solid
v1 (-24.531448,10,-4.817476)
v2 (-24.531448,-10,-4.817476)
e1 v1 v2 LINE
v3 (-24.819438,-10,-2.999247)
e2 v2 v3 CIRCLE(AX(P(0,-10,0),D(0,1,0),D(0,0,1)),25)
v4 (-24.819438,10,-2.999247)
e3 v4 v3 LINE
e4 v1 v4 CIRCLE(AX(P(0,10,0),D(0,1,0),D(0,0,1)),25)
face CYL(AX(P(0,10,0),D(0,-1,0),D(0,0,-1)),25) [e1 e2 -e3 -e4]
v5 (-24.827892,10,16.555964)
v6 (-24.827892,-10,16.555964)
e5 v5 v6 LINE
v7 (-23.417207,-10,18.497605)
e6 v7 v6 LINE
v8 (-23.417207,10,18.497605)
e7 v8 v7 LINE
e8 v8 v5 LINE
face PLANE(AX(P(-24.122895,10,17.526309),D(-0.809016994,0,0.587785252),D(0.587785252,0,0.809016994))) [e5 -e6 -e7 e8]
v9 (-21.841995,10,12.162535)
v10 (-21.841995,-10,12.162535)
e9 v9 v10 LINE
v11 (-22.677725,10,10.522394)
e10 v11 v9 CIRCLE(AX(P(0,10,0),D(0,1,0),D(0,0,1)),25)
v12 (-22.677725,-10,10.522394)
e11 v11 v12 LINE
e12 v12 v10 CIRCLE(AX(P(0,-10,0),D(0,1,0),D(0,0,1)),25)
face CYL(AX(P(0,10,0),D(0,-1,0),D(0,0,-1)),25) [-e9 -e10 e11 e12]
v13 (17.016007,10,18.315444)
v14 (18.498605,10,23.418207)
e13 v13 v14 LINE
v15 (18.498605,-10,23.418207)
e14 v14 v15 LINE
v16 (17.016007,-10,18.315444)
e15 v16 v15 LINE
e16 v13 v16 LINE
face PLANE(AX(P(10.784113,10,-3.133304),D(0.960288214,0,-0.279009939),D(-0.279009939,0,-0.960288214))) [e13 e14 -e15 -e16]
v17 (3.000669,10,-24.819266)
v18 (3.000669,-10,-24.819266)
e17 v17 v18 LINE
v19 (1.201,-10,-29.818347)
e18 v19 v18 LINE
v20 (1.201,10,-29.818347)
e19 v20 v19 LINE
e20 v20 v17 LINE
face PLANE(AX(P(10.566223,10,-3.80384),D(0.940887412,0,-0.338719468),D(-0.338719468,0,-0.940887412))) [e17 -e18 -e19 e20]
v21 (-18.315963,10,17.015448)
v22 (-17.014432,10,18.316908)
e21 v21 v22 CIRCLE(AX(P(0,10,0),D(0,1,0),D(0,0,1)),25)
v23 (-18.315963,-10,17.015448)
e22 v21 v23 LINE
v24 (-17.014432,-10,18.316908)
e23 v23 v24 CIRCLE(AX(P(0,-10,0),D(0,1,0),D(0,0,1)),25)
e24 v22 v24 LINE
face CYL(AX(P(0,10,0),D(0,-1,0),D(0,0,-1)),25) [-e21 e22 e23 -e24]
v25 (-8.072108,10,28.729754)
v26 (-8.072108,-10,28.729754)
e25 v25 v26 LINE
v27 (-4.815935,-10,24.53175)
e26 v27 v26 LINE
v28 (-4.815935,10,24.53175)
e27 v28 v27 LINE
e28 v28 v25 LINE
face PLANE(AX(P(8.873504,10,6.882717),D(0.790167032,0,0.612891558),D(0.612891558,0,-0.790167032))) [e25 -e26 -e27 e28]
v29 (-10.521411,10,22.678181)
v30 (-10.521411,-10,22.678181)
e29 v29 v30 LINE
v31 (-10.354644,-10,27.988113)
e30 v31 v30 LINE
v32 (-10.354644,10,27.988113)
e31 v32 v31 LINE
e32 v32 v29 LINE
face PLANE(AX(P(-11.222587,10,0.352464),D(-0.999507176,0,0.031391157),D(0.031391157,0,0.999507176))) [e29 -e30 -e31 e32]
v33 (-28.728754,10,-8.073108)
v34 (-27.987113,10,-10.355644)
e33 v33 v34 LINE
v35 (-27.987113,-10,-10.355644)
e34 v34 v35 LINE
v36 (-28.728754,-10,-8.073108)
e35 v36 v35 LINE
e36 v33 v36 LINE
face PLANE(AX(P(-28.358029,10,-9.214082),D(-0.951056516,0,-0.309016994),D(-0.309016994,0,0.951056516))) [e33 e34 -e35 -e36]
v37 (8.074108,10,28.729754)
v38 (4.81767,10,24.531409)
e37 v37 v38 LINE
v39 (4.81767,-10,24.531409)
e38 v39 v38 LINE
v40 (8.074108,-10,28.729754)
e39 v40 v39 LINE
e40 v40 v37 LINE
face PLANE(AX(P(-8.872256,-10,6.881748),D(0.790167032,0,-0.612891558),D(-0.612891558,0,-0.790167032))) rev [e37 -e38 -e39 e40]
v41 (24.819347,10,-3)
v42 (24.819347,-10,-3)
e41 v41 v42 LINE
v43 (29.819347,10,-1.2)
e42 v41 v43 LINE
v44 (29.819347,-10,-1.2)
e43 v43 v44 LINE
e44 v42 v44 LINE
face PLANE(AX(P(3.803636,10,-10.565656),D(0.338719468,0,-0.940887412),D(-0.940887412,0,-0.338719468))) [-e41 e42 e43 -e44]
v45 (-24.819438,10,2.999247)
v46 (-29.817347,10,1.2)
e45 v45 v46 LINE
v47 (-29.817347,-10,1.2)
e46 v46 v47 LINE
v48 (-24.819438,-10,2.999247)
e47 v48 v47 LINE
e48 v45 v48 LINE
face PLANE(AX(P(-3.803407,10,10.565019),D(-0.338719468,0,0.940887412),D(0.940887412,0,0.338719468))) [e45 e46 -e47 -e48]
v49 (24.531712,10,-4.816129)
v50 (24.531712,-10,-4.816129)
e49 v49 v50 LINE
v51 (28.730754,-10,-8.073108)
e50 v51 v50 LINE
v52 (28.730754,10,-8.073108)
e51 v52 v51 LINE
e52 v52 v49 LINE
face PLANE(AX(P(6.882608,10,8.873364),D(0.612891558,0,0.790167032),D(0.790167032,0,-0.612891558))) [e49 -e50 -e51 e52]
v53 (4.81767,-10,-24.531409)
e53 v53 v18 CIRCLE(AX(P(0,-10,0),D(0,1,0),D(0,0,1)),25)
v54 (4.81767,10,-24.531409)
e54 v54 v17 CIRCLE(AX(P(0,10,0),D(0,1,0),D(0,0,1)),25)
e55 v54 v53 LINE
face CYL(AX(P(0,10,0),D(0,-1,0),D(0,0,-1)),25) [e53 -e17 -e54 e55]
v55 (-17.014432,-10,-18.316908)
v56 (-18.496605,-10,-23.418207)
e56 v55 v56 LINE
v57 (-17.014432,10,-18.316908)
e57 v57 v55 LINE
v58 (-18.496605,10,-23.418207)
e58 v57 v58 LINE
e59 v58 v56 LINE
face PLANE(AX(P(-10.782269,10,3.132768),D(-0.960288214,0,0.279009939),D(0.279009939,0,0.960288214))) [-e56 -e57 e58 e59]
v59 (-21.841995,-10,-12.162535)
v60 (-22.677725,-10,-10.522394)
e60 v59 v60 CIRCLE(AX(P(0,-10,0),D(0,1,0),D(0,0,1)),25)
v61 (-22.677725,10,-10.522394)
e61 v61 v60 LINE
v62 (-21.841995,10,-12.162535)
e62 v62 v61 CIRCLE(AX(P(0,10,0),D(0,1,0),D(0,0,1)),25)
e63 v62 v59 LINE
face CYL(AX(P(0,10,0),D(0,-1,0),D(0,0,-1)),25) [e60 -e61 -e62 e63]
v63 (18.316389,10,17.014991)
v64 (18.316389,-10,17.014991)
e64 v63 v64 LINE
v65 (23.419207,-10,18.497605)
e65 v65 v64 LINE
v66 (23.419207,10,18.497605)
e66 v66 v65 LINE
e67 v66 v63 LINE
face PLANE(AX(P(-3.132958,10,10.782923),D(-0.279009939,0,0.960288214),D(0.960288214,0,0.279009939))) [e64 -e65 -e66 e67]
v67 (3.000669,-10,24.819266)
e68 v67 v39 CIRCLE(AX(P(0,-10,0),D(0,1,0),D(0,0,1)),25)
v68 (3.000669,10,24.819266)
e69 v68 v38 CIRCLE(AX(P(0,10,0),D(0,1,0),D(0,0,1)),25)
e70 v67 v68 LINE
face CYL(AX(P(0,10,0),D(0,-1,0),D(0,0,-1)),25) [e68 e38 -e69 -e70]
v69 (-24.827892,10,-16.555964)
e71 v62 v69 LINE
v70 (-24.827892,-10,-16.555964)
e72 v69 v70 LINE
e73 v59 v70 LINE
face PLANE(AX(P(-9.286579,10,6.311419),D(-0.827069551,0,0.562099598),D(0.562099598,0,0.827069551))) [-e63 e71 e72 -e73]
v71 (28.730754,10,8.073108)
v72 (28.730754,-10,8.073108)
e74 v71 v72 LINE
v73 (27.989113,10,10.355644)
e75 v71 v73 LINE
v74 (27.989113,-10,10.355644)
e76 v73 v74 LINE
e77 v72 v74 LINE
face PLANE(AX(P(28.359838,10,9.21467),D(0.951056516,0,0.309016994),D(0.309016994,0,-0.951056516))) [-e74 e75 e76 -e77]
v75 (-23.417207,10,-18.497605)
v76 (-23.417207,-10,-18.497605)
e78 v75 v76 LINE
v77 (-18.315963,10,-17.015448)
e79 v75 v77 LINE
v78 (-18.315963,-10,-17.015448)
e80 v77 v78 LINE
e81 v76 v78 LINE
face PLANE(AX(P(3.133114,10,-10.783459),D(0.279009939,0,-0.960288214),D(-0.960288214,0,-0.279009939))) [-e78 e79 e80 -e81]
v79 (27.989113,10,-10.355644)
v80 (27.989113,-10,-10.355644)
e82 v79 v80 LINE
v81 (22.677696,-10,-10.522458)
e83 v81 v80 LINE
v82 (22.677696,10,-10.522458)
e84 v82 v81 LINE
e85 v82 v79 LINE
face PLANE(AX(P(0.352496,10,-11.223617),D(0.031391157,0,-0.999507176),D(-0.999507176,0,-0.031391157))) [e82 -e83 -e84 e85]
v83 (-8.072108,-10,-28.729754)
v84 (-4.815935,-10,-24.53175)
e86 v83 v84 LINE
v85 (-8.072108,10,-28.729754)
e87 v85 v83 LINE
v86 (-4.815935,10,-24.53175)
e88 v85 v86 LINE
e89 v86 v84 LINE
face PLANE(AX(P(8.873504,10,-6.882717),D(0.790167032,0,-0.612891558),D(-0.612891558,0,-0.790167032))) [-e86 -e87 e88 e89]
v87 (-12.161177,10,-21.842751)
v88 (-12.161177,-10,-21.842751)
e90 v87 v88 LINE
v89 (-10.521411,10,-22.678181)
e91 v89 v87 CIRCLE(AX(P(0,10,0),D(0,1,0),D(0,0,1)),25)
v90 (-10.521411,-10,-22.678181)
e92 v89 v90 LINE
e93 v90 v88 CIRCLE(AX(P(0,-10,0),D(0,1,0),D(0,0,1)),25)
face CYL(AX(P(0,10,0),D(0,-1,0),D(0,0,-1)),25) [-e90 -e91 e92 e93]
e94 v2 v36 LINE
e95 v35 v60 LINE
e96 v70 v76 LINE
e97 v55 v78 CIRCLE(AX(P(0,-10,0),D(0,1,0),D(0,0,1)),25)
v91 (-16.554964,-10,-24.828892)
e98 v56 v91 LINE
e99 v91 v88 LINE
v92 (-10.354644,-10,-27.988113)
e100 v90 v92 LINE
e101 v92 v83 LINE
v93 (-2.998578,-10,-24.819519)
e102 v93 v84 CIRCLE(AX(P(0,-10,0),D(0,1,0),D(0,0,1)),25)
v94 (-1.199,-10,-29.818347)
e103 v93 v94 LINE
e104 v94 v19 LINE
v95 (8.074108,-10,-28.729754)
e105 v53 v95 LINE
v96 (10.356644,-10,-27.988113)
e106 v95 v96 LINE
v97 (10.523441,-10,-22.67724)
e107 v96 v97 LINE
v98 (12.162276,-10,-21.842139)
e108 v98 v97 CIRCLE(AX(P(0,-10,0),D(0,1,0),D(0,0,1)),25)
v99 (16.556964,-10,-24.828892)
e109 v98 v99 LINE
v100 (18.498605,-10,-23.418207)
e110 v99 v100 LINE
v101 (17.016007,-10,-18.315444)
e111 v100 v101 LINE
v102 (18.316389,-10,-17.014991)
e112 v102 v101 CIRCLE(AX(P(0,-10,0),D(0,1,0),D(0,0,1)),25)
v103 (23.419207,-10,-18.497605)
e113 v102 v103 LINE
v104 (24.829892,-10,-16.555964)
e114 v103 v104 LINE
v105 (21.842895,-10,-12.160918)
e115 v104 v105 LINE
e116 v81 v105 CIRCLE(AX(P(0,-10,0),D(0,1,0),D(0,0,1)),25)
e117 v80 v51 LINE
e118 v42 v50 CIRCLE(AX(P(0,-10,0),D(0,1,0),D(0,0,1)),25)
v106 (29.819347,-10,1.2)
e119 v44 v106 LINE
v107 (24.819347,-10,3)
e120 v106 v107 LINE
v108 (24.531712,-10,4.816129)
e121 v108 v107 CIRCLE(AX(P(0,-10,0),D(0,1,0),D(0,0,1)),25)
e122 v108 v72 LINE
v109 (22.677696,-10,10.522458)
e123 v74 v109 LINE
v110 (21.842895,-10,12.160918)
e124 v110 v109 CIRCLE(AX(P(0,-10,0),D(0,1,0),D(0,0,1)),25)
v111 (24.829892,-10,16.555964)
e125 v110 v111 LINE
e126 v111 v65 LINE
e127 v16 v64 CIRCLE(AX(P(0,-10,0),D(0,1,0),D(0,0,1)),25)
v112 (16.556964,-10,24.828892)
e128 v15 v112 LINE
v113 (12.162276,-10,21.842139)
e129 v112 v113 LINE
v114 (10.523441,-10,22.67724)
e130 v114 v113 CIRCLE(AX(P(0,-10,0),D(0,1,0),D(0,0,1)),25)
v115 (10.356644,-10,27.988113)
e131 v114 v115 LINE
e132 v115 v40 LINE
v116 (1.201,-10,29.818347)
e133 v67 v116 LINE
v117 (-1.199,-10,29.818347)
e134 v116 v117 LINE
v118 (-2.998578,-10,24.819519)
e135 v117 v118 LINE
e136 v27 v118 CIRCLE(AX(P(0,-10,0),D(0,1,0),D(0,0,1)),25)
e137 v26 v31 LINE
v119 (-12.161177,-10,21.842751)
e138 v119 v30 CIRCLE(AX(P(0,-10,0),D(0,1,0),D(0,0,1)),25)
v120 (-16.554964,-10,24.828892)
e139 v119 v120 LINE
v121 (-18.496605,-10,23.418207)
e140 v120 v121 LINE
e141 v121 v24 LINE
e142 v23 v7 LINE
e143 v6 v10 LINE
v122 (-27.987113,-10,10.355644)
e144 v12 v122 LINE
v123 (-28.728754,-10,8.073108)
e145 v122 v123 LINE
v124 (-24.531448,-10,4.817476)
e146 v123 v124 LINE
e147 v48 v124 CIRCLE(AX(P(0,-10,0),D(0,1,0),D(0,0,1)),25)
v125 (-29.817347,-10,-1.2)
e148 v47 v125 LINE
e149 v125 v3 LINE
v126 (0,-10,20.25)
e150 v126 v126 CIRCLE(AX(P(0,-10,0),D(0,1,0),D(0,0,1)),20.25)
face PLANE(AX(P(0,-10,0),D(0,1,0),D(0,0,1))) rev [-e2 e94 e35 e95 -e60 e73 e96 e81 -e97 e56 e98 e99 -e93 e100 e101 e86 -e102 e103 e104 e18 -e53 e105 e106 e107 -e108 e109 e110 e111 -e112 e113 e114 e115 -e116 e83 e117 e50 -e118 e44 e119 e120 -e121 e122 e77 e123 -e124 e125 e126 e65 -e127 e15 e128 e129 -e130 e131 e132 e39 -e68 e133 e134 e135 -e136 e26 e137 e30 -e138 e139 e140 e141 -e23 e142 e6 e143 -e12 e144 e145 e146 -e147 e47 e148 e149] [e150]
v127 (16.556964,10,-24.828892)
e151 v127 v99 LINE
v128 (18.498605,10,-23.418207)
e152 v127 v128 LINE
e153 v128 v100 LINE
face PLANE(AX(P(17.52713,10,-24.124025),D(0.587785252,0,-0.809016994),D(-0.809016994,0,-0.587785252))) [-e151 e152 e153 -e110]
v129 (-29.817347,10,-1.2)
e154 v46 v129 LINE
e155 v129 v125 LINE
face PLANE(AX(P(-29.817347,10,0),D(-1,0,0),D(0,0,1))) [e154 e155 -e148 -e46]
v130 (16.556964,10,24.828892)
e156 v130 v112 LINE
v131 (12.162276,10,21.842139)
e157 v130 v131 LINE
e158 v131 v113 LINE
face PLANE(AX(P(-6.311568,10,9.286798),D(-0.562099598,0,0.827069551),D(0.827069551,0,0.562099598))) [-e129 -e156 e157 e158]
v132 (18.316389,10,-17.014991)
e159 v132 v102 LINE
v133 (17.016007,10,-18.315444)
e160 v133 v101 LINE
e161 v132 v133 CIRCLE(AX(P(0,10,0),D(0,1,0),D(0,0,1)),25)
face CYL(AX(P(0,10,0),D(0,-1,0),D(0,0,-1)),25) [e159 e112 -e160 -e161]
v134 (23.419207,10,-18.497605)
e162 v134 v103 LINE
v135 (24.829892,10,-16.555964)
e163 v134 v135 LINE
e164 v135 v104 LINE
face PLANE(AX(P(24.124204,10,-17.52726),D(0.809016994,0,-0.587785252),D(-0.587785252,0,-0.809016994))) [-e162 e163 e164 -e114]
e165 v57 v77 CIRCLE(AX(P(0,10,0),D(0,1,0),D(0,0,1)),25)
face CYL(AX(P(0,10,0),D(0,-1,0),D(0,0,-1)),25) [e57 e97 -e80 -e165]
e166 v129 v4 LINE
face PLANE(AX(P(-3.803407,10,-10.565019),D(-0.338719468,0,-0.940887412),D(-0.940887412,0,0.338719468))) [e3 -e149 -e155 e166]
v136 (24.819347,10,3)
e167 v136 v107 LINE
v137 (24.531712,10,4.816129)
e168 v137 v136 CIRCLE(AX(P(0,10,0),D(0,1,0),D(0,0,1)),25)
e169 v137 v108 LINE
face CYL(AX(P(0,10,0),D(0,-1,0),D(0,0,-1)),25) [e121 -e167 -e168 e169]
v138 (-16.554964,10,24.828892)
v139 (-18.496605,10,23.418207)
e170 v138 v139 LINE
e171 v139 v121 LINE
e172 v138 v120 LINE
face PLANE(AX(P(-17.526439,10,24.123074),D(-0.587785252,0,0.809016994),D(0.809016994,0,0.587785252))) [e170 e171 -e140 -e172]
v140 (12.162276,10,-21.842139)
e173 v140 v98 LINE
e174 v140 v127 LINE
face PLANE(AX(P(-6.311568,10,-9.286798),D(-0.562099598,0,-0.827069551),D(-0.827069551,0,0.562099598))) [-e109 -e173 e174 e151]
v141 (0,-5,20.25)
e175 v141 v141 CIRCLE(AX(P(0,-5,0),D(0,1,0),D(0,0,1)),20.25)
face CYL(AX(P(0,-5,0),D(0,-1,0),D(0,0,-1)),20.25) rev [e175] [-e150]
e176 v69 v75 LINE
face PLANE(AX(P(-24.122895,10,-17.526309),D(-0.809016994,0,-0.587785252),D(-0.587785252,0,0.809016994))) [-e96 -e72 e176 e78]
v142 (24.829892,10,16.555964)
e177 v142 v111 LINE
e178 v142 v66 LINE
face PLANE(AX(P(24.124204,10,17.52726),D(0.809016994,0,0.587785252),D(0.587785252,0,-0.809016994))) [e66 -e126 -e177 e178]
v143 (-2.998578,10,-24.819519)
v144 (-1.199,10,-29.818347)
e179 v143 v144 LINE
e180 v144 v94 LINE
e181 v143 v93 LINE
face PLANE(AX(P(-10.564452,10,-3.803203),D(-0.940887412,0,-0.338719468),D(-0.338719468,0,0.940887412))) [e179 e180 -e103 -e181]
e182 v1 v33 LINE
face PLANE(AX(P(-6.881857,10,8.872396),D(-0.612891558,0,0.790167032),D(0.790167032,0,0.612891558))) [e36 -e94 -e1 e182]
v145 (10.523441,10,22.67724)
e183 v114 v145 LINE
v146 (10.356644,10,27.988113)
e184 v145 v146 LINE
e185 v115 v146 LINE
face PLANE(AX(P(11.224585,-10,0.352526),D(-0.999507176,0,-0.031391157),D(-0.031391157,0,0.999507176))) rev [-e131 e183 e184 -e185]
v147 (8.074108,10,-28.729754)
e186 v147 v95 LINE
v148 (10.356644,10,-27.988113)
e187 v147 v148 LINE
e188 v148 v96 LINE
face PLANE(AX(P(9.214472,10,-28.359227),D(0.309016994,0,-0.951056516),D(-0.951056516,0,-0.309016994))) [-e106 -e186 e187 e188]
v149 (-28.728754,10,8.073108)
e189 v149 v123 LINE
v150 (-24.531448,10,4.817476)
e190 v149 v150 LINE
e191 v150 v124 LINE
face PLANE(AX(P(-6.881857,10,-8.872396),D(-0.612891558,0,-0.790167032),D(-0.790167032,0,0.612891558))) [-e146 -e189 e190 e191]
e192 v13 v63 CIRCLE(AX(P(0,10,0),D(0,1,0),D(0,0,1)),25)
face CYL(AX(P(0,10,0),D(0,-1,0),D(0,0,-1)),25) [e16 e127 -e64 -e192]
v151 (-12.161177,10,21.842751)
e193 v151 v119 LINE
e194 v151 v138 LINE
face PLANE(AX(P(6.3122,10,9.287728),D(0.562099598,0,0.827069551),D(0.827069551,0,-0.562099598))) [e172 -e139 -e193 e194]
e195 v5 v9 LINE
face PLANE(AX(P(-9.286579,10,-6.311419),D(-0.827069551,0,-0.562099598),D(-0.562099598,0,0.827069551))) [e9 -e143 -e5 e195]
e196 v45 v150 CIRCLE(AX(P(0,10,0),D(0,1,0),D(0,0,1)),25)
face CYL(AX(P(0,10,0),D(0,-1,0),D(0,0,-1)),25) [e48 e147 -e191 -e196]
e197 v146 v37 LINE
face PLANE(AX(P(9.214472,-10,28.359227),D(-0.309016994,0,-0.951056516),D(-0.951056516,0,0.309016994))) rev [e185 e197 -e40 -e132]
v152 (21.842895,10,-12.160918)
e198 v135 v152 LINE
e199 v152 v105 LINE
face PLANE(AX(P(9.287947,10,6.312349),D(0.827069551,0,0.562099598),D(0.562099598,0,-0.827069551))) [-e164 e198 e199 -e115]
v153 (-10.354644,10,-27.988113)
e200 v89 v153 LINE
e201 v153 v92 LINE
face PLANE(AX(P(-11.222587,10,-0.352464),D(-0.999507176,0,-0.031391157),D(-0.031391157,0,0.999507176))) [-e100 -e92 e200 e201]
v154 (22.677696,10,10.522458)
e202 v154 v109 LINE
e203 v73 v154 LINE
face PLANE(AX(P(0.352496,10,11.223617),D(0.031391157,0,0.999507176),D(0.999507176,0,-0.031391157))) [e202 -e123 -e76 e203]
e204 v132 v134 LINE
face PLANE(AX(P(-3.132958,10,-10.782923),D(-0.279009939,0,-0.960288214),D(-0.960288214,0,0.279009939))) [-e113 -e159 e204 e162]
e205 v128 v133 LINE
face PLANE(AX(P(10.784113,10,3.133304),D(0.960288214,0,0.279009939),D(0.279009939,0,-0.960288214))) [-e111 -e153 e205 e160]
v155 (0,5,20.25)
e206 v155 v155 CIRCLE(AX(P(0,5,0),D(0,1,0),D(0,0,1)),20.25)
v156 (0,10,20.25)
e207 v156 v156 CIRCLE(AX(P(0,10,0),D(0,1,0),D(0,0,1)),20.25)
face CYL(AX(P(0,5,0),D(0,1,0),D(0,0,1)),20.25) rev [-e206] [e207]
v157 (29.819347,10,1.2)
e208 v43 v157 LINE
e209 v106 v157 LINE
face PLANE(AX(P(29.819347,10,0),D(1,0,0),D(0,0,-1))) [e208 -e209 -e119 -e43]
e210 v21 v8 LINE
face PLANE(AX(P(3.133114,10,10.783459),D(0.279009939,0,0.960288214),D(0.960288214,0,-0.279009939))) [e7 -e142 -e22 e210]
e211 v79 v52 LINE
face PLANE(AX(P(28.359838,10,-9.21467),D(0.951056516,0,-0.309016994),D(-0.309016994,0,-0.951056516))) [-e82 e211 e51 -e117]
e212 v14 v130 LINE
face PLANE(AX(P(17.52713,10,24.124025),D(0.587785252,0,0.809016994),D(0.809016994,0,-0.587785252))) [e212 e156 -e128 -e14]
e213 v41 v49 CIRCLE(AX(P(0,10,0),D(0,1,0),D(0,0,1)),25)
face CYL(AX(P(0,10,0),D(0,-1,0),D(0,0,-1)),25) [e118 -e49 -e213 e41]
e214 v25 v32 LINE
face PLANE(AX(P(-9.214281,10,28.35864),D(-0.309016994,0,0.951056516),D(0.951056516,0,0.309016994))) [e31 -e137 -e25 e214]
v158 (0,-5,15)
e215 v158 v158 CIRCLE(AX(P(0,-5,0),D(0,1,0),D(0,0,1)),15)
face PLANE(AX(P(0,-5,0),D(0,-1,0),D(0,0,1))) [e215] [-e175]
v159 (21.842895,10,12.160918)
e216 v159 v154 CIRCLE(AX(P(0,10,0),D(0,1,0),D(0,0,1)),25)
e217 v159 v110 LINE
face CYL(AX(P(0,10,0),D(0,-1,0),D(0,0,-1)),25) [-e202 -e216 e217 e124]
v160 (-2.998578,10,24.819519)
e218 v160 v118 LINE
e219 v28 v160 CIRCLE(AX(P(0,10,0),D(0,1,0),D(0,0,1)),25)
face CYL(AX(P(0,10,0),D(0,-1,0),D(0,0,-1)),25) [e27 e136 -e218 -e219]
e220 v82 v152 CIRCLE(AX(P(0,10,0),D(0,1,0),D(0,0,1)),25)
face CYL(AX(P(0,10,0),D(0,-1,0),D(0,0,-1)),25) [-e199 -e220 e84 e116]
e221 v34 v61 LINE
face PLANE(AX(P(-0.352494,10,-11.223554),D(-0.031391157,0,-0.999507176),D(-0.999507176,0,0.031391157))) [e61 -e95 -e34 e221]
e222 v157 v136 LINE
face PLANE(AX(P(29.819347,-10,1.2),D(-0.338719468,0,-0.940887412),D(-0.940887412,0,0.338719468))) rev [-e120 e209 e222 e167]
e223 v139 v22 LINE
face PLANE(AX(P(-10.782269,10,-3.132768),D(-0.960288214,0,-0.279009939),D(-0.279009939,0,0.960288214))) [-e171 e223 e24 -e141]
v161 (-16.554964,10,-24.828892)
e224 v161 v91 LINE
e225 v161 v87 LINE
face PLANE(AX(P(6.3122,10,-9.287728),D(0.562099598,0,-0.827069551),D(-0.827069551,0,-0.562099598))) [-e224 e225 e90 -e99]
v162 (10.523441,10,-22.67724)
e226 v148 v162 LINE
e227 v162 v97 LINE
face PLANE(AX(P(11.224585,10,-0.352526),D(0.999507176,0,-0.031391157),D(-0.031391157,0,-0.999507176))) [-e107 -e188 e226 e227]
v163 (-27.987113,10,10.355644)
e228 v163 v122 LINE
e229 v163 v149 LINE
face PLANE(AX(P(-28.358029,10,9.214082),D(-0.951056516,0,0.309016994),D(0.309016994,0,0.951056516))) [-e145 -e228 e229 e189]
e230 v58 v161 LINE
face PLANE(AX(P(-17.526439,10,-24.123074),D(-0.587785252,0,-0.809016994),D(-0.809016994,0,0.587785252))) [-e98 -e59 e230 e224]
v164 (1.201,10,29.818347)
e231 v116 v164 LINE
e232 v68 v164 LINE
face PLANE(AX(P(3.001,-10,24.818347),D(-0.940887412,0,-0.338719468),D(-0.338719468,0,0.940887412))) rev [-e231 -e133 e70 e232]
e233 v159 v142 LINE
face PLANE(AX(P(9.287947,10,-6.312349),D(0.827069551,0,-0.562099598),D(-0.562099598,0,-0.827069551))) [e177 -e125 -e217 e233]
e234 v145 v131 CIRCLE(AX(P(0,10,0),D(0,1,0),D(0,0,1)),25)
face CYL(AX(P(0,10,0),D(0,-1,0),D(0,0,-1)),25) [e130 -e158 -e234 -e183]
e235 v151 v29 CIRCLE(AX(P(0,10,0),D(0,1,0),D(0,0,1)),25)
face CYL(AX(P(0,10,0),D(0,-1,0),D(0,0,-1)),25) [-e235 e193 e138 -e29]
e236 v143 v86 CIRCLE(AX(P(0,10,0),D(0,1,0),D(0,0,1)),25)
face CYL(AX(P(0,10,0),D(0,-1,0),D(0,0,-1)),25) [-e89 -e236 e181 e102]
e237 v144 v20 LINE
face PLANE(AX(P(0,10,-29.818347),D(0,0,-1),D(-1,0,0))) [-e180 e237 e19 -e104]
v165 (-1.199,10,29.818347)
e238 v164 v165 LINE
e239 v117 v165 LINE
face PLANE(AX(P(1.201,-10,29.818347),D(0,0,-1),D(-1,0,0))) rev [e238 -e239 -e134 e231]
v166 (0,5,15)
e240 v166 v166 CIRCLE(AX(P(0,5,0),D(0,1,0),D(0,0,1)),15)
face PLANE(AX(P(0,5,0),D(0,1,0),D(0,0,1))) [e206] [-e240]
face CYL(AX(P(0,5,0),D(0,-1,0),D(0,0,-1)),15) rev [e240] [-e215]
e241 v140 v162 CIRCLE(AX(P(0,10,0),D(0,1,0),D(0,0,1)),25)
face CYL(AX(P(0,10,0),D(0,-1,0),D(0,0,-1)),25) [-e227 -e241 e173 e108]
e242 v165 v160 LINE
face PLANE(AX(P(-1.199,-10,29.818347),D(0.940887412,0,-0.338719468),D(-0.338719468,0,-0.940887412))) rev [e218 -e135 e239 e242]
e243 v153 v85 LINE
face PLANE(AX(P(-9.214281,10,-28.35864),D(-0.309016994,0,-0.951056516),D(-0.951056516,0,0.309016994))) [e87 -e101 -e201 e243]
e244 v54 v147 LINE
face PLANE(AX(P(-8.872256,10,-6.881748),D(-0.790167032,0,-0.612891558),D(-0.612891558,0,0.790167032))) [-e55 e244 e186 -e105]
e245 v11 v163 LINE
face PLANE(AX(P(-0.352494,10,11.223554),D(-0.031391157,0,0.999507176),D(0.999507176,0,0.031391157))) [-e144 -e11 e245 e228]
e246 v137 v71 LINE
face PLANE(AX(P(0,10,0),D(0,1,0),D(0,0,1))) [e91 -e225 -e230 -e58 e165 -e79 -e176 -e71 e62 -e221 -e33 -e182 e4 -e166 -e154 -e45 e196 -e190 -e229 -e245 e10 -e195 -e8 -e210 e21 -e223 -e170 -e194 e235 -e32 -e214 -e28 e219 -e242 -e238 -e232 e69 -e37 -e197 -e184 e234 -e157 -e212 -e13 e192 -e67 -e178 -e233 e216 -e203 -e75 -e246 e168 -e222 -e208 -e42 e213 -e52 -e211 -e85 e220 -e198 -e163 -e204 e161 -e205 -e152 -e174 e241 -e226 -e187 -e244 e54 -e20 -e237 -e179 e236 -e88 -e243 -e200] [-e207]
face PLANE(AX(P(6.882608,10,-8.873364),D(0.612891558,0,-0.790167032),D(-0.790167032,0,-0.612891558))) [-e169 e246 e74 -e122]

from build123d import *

# Parameters (mm, degrees)
BOSS_EXTRUDE2_START     = -10
BOSS_EXTRUDE2_DEPTH     = 20
CUT_EXTRUDE1_DEPTH      = 5
CUT_EXTRUDE1_DEPTH_BACK = 5
SKETCH3_R               = 15
SKETCH4_R               = 20.25
CUT_EXTRUDE2_DEPTH      = 5


# Read off the part's stored shape, not the designer's step: Boss-Extrude2
with BuildPart() as part:
    # Boss-Extrude2 outline → Boss-Extrude2 (new body)
    with BuildSketch(Plane(origin=(0, 0, 0), x_dir=(1, 0, 0), z_dir=(0, 1, 0)).offset(BOSS_EXTRUDE2_START)):
        with BuildLine():
            Line((24.819347292, -3), (29.819347292, -1.2))
            Line((29.819347292, -1.2), (29.819347292, 1.2))
            Line((29.819347292, 1.2), (24.819347292, 3))
            ThreePointArc((24.819347292, 3), (24.692232517, 3.910710079), (24.531712075, 4.81612943))
            Line((24.531712075, 4.81612943), (28.73075389, 8.073108238))
            Line((28.73075389, 8.073108238), (27.989113104, 10.355643877))
            Line((27.989113104, 10.355643877), (22.677695772, 10.522457624))
            ThreePointArc((22.677695772, 10.522457624), (22.275365258, 11.349365736), (21.842895395, 12.160917759))
            Line((21.842895395, 12.160917759), (24.829892006, 16.555964393))
            Line((24.829892006, 16.555964393), (23.419207401, 18.497605179))
            Line((23.419207401, 18.497605179), (18.316388565, 17.014990742))
            ThreePointArc((18.316388565, 17.014990742), (17.678159939, 17.677179107), (17.016006986, 18.315444473))
            Line((17.016006986, 18.315444473), (18.498605179, 23.418207401))
            Line((18.498605179, 23.418207401), (16.556964393, 24.828892006))
            Line((16.556964393, 24.828892006), (12.162276227, 21.84213902))
            ThreePointArc((12.162276227, 21.84213902), (11.350541159, 22.274766338), (10.523440542, 22.677239672))
            Line((10.523440542, 22.677239672), (10.356643877, 27.988113104))
            Line((10.356643877, 27.988113104), (8.074108238, 28.72975389))
            Line((8.074108238, 28.72975389), (4.817670386, 24.5314095))
            ThreePointArc((4.817670386, 24.5314095), (3.911818446, 24.69205695), (3.00066912, 24.819266404))
            Line((3.00066912, 24.819266404), (1.201, 29.818347292))
            Line((1.201, 29.818347292), (-1.199, 29.818347292))
            Line((-1.199, 29.818347292), (-2.998578144, 24.819519115))
            ThreePointArc((-2.998578144, 24.819519115), (-3.909904803, 24.692360042), (-4.815934726, 24.531750299))
            Line((-4.815934726, 24.531750299), (-8.072108238, 28.72975389))
            Line((-8.072108238, 28.72975389), (-10.354643877, 27.988113104))
            Line((-10.354643877, 27.988113104), (-10.521410966, 22.678181393))
            ThreePointArc((-10.521410966, 22.678181393), (-11.348983821, 22.275559841), (-12.16117688, 21.842751129))
            Line((-12.16117688, 21.842751129), (-16.554964393, 24.828892006))
            Line((-16.554964393, 24.828892006), (-18.496605179, 23.418207401))
            Line((-18.496605179, 23.418207401), (-17.014432073, 18.316907524))
            ThreePointArc((-17.014432073, 18.316907524), (-17.677179115, 17.678159931), (-18.315963478, 17.01544833))
            Line((-18.315963478, 17.01544833), (-23.417207401, 18.497605179))
            Line((-23.417207401, 18.497605179), (-24.827892006, 16.555964393))
            Line((-24.827892006, 16.555964393), (-21.841994742, 12.162535331))
            ThreePointArc((-21.841994742, 12.162535331), (-22.274960948, 11.350159239), (-22.677725349, 10.522393882))
            Line((-22.677725349, 10.522393882), (-27.987113104, 10.355643877))
            Line((-27.987113104, 10.355643877), (-28.72875389, 8.073108238))
            Line((-28.72875389, 8.073108238), (-24.531447735, 4.817475691))
            ThreePointArc((-24.531447735, 4.817475691), (-24.692184512, 3.91101317), (-24.819438268, 2.999247249))
            Line((-24.819438268, 2.999247249), (-29.817347292, 1.2))
            Line((-29.817347292, 1.2), (-29.817347292, -1.2))
            Line((-29.817347292, -1.2), (-24.819438268, -2.999247249))
            ThreePointArc((-24.819438268, -2.999247249), (-24.692184512, -3.91101317), (-24.531447735, -4.817475691))
            Line((-24.531447735, -4.817475691), (-28.72875389, -8.073108238))
            Line((-28.72875389, -8.073108238), (-27.987113104, -10.355643877))
            Line((-27.987113104, -10.355643877), (-22.677725349, -10.522393882))
            ThreePointArc((-22.677725349, -10.522393882), (-22.274960948, -11.350159239), (-21.841994742, -12.162535331))
            Line((-21.841994742, -12.162535331), (-24.827892006, -16.555964393))
            Line((-24.827892006, -16.555964393), (-23.417207401, -18.497605179))
            Line((-23.417207401, -18.497605179), (-18.315963478, -17.01544833))
            ThreePointArc((-18.315963478, -17.01544833), (-17.677179115, -17.678159931), (-17.014432073, -18.316907524))
            Line((-17.014432073, -18.316907524), (-18.496605179, -23.418207401))
            Line((-18.496605179, -23.418207401), (-16.554964393, -24.828892006))
            Line((-16.554964393, -24.828892006), (-12.16117688, -21.842751129))
            ThreePointArc((-12.16117688, -21.842751129), (-11.348983821, -22.275559841), (-10.521410966, -22.678181393))
            Line((-10.521410966, -22.678181393), (-10.354643877, -27.988113104))
            Line((-10.354643877, -27.988113104), (-8.072108238, -28.72975389))
            Line((-8.072108238, -28.72975389), (-4.815934726, -24.531750299))
            ThreePointArc((-4.815934726, -24.531750299), (-3.909904803, -24.692360042), (-2.998578144, -24.819519115))
            Line((-2.998578144, -24.819519115), (-1.199, -29.818347292))
            Line((-1.199, -29.818347292), (1.201, -29.818347292))
            Line((1.201, -29.818347292), (3.00066912, -24.819266404))
            ThreePointArc((3.00066912, -24.819266404), (3.911818446, -24.69205695), (4.817670386, -24.5314095))
            Line((4.817670386, -24.5314095), (8.074108238, -28.72975389))
            Line((8.074108238, -28.72975389), (10.356643877, -27.988113104))
            Line((10.356643877, -27.988113104), (10.523440542, -22.677239672))
            ThreePointArc((10.523440542, -22.677239672), (11.350541159, -22.274766338), (12.162276227, -21.84213902))
            Line((12.162276227, -21.84213902), (16.556964393, -24.828892006))
            Line((16.556964393, -24.828892006), (18.498605179, -23.418207401))
            Line((18.498605179, -23.418207401), (17.016006986, -18.315444473))
            ThreePointArc((17.016006986, -18.315444473), (17.678159939, -17.677179107), (18.316388565, -17.014990742))
            Line((18.316388565, -17.014990742), (23.419207401, -18.497605179))
            Line((23.419207401, -18.497605179), (24.829892006, -16.555964393))
            Line((24.829892006, -16.555964393), (21.842895395, -12.160917759))
            ThreePointArc((21.842895395, -12.160917759), (22.275365258, -11.349365736), (22.677695772, -10.522457624))
            Line((22.677695772, -10.522457624), (27.989113104, -10.355643877))
            Line((27.989113104, -10.355643877), (28.73075389, -8.073108238))
            Line((28.73075389, -8.073108238), (24.531712075, -4.81612943))
            ThreePointArc((24.531712075, -4.81612943), (24.692232517, -3.910710079), (24.819347292, -3))
        make_face()
    extrude(amount=BOSS_EXTRUDE2_DEPTH)

    # Sketch3 → Cut-Extrude1 (cut, two sides: drawn at the far end of the back side and taken through both)
    with BuildSketch(Plane(origin=(0, 0, 0), x_dir=(1, 0, 0), z_dir=(0, 1, 0)).offset(-CUT_EXTRUDE1_DEPTH_BACK)):
        with Locations(Location((0, 0, 0), (0, 0, 270))):
            Circle(SKETCH3_R)
    extrude(amount=CUT_EXTRUDE1_DEPTH + CUT_EXTRUDE1_DEPTH_BACK, mode=Mode.SUBTRACT)

    # Sketch4 → Cut-Extrude2 (cut)
    with BuildSketch(Plane(origin=(0, 10, 0), x_dir=(1, 0, 0), z_dir=(0, 1, 0))):
        with Locations(Location((0, 0, 0), (0, 0, 270))):
            Circle(SKETCH4_R)
    cut_extrude2 = extrude(amount=-CUT_EXTRUDE2_DEPTH, mode=Mode.SUBTRACT)

    # Mirror1: Cut-Extrude2 across plane
    add(cut_extrude2.mirror(Plane.ZX), mode=Mode.SUBTRACT)


solid = part.part
